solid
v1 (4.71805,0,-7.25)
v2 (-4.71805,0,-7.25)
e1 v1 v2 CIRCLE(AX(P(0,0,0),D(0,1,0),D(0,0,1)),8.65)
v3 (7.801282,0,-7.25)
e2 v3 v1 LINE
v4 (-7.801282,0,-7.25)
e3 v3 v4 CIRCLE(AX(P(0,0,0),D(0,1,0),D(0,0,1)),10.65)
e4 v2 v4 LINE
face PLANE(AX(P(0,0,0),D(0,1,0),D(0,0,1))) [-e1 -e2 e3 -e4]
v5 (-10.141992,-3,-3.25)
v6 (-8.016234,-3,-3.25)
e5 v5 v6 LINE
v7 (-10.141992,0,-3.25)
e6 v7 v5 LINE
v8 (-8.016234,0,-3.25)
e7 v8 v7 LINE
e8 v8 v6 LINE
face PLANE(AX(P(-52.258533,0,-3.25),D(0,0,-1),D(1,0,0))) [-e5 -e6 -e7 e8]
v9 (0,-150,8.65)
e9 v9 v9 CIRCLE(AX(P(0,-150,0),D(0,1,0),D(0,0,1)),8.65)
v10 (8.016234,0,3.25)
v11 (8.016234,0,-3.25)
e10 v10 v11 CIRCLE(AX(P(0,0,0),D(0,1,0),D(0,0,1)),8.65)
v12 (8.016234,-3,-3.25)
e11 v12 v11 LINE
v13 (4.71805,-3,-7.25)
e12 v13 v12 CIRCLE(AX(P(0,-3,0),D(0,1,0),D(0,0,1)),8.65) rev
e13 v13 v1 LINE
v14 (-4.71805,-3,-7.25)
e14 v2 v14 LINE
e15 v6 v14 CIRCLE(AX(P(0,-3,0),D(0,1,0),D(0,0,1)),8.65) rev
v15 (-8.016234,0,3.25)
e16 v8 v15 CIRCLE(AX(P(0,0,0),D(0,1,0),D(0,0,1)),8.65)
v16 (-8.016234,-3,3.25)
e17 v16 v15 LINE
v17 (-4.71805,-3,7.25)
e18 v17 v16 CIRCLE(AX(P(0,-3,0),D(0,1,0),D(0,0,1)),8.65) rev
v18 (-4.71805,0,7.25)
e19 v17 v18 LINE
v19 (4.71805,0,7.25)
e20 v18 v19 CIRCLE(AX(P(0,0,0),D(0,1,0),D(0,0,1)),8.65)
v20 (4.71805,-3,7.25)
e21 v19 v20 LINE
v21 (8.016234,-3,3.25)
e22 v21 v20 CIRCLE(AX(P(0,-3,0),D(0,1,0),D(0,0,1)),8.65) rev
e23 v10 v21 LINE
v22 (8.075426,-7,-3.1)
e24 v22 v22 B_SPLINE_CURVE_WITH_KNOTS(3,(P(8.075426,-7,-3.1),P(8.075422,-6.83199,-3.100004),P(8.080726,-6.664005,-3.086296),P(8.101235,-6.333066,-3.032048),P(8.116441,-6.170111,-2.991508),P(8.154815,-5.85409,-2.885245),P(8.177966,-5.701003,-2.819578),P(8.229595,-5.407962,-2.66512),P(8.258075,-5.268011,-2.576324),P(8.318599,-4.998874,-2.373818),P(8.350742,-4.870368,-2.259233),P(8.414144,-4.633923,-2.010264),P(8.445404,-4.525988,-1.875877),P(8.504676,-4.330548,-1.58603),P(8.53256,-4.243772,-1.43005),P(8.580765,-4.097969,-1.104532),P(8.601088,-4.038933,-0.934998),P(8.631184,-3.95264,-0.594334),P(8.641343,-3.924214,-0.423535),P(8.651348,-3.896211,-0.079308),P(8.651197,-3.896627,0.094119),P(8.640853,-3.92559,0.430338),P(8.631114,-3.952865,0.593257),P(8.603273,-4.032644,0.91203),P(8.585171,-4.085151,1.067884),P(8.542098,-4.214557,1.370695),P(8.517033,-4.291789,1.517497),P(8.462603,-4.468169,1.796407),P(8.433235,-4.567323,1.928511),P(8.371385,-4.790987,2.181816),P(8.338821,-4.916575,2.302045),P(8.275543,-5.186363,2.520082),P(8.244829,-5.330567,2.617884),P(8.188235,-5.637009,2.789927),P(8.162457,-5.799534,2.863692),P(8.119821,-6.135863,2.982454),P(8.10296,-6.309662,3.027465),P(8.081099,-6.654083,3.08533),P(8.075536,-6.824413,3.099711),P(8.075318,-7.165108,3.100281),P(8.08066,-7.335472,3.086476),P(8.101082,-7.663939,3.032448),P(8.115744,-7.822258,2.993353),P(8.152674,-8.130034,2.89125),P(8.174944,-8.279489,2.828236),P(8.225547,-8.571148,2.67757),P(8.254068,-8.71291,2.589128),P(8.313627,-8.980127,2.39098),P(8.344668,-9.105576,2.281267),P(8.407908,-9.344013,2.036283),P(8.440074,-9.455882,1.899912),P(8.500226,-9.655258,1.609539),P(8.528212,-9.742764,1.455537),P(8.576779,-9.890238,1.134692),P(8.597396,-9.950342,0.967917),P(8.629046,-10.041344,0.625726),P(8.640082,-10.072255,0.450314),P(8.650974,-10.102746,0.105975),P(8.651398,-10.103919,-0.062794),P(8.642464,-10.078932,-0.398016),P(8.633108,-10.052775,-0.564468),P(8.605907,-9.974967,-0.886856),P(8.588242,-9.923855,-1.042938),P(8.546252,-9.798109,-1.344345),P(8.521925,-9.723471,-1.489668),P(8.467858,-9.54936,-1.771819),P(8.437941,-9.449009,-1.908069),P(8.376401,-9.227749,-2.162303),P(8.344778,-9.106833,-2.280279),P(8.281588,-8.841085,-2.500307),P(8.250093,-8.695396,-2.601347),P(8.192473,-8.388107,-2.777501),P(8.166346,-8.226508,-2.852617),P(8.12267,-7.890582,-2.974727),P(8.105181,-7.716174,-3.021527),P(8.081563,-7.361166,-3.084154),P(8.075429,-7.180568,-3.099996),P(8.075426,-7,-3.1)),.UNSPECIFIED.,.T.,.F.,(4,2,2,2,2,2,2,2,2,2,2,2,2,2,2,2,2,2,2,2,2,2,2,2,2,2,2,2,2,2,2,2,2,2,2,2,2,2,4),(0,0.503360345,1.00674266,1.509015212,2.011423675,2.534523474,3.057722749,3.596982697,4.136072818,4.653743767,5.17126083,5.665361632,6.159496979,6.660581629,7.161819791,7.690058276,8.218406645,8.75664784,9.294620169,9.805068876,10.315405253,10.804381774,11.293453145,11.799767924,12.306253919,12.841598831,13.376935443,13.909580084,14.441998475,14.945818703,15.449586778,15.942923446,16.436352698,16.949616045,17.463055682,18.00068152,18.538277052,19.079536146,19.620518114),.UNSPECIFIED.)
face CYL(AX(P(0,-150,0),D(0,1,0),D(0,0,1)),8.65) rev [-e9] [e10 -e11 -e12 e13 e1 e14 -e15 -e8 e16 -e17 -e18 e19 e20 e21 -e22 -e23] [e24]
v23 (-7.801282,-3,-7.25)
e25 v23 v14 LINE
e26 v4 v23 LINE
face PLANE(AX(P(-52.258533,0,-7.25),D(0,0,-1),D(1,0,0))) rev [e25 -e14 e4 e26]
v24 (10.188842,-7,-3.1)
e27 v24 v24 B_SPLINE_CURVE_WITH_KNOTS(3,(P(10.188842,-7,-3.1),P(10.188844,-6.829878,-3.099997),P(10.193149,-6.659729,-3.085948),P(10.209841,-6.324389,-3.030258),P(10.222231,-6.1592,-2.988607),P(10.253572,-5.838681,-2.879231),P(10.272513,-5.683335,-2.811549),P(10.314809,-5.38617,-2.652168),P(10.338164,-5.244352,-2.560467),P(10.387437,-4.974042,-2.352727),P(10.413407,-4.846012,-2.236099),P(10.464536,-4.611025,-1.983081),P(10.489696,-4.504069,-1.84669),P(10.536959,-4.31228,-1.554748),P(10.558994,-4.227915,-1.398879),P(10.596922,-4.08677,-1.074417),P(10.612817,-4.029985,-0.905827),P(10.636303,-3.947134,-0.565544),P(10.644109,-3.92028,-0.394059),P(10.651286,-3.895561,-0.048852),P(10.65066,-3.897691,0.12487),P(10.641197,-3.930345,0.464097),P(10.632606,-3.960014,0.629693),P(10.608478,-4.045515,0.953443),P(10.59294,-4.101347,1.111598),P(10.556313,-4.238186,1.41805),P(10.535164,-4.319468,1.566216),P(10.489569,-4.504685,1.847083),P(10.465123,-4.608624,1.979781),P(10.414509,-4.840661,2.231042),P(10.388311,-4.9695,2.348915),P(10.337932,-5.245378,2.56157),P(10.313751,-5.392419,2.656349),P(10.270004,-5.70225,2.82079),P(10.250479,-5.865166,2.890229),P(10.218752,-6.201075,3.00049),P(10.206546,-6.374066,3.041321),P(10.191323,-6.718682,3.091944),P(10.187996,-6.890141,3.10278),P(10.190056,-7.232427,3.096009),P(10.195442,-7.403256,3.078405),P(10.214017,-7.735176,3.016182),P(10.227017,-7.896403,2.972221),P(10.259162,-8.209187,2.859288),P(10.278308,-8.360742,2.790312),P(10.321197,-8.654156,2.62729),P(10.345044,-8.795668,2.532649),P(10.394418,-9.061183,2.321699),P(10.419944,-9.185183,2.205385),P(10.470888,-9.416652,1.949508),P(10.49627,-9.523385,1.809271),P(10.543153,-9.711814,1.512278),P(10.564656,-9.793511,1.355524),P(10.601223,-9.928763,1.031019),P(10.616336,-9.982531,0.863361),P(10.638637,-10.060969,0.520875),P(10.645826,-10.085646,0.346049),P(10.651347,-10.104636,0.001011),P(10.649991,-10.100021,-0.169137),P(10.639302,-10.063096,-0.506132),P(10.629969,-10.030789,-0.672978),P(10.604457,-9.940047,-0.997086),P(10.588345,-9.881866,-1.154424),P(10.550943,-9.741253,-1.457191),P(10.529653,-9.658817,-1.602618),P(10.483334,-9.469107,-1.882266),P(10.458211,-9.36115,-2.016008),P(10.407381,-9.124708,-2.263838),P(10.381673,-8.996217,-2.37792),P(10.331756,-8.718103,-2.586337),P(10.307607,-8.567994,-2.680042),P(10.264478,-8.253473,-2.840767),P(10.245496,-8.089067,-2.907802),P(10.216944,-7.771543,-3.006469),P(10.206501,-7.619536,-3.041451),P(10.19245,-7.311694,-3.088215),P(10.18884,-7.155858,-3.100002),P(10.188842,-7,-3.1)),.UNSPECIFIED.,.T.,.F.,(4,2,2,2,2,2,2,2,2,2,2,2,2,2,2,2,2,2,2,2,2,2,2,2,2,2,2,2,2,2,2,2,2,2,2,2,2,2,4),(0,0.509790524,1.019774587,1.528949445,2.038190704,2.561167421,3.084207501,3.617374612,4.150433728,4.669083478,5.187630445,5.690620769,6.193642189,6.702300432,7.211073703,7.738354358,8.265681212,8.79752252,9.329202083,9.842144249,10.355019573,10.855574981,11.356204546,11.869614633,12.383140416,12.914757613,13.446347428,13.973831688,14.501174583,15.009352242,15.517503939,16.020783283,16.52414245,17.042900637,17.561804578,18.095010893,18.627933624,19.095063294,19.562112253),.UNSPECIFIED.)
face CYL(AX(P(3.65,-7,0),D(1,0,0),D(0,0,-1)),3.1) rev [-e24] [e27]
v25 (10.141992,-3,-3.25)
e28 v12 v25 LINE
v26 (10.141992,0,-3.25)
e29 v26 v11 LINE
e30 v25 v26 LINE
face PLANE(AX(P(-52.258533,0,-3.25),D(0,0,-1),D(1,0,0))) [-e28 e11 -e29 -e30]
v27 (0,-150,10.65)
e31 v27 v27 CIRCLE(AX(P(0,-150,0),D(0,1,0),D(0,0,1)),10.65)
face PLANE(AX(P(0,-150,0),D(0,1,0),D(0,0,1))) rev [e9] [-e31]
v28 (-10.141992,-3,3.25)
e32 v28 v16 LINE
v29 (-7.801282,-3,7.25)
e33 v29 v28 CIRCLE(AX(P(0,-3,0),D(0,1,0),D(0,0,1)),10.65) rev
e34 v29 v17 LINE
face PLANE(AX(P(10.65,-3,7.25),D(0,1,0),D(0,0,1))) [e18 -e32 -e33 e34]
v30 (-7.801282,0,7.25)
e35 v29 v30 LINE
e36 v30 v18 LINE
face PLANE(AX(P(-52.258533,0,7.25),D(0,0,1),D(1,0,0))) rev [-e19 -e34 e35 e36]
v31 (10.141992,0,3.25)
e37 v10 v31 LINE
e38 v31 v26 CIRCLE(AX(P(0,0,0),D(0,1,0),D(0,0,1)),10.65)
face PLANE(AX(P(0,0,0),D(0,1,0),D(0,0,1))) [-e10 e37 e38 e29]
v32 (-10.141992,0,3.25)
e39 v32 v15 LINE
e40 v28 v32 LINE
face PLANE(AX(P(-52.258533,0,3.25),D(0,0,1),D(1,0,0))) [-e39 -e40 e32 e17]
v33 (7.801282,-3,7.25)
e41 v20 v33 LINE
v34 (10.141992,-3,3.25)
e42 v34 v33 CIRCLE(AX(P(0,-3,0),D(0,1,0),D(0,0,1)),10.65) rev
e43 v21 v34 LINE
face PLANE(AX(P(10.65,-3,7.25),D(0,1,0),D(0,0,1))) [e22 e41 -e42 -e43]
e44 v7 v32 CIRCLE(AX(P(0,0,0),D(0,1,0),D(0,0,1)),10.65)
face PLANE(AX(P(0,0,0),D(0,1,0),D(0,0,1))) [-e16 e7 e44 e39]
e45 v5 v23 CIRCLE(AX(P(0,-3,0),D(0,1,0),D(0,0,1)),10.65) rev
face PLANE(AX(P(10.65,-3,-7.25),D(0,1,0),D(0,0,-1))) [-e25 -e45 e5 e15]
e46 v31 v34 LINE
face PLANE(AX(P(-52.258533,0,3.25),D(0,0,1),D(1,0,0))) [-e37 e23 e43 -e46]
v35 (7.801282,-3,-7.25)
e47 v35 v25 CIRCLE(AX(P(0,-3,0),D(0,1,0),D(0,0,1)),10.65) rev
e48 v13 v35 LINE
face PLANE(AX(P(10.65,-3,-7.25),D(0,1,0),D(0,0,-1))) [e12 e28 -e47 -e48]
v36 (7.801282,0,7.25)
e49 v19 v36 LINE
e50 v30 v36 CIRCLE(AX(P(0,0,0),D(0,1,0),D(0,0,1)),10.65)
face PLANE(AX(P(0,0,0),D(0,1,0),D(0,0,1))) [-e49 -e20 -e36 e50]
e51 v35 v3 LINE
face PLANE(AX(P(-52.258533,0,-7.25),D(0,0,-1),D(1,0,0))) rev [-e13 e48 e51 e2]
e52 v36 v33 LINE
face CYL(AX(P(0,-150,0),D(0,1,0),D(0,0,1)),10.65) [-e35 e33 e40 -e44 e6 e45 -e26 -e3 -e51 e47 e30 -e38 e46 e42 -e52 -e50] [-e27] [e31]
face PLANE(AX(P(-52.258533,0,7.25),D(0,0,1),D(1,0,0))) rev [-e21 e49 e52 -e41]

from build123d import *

# Parameters (mm, degrees)
SKETCH_1_R          = 10.65
SKETCH_1_R_2        = 8.65
EXTRUDE_1_DEPTH     = 150
SKETCH_2_R          = 3.1
CUT_EXTRUDE_1_DEPTH = 5
OTHER_START         = -3
OTHER_1_DEPTH       = 3


# Read off the part's stored shape, not the designer's step: Полость1
with BuildPart() as part:
    # Эскиз1 → Бобышка-Вытянуть1 (new body)
    with BuildSketch(Plane(origin=(0, 0, 0), x_dir=(1, 0, 0), z_dir=(0, 1, 0))):
        with Locations(Location((0, 0, 0), (0, 0, 270))):
            Circle(SKETCH_1_R)
        with Locations(Location((0, 0, 0), (0, 0, 270))):
            Circle(SKETCH_1_R_2, mode=Mode.SUBTRACT)
    extrude(amount=-EXTRUDE_1_DEPTH)

    # Эскиз2 → Вырез-Вытянуть1 (cut, symmetric)
    with BuildSketch(Plane(origin=(8.65, 0, 0), x_dir=(0, 0, -1), z_dir=(1, 0, 0))):
        with Locations((0, -7)):
            Circle(SKETCH_2_R)
    extrude(amount=CUT_EXTRUDE_1_DEPTH, both=True, mode=Mode.SUBTRACT)

    # Полость1 outline → Полость1 (cut)
    with BuildSketch(Plane(origin=(0, 0, 0), x_dir=(1, 0, 0), z_dir=(0, 1, 0)).offset(OTHER_START)):
        with BuildLine():
            Line((10.141991915, -3.25), (8.01623353, -3.25))
            ThreePointArc((8.01623353, -3.25), (6.673866727, -5.502908587), (4.718050445, -7.25))
            Line((4.718050445, -7.25), (7.801281946, -7.25))
            ThreePointArc((7.801281946, -7.25), (9.191858855, -5.378868914), (10.141991915, -3.25))
        make_face()
        with BuildLine():
            Line((-7.801281946, -7.25), (-4.718050445, -7.25))
            ThreePointArc((-4.718050445, -7.25), (-6.673866727, -5.502908587), (-8.01623353, -3.25))
            Line((-8.01623353, -3.25), (-10.141991915, -3.25))
            ThreePointArc((-10.141991915, -3.25), (-9.191858855, -5.378868914), (-7.801281946, -7.25))
        make_face()
    other_1 = extrude(amount=OTHER_1_DEPTH, mode=Mode.SUBTRACT)

    # Зеркальное отражение1: Полость1 across plane
    add(other_1.mirror(Plane.XY), mode=Mode.SUBTRACT)


solid = part.part
